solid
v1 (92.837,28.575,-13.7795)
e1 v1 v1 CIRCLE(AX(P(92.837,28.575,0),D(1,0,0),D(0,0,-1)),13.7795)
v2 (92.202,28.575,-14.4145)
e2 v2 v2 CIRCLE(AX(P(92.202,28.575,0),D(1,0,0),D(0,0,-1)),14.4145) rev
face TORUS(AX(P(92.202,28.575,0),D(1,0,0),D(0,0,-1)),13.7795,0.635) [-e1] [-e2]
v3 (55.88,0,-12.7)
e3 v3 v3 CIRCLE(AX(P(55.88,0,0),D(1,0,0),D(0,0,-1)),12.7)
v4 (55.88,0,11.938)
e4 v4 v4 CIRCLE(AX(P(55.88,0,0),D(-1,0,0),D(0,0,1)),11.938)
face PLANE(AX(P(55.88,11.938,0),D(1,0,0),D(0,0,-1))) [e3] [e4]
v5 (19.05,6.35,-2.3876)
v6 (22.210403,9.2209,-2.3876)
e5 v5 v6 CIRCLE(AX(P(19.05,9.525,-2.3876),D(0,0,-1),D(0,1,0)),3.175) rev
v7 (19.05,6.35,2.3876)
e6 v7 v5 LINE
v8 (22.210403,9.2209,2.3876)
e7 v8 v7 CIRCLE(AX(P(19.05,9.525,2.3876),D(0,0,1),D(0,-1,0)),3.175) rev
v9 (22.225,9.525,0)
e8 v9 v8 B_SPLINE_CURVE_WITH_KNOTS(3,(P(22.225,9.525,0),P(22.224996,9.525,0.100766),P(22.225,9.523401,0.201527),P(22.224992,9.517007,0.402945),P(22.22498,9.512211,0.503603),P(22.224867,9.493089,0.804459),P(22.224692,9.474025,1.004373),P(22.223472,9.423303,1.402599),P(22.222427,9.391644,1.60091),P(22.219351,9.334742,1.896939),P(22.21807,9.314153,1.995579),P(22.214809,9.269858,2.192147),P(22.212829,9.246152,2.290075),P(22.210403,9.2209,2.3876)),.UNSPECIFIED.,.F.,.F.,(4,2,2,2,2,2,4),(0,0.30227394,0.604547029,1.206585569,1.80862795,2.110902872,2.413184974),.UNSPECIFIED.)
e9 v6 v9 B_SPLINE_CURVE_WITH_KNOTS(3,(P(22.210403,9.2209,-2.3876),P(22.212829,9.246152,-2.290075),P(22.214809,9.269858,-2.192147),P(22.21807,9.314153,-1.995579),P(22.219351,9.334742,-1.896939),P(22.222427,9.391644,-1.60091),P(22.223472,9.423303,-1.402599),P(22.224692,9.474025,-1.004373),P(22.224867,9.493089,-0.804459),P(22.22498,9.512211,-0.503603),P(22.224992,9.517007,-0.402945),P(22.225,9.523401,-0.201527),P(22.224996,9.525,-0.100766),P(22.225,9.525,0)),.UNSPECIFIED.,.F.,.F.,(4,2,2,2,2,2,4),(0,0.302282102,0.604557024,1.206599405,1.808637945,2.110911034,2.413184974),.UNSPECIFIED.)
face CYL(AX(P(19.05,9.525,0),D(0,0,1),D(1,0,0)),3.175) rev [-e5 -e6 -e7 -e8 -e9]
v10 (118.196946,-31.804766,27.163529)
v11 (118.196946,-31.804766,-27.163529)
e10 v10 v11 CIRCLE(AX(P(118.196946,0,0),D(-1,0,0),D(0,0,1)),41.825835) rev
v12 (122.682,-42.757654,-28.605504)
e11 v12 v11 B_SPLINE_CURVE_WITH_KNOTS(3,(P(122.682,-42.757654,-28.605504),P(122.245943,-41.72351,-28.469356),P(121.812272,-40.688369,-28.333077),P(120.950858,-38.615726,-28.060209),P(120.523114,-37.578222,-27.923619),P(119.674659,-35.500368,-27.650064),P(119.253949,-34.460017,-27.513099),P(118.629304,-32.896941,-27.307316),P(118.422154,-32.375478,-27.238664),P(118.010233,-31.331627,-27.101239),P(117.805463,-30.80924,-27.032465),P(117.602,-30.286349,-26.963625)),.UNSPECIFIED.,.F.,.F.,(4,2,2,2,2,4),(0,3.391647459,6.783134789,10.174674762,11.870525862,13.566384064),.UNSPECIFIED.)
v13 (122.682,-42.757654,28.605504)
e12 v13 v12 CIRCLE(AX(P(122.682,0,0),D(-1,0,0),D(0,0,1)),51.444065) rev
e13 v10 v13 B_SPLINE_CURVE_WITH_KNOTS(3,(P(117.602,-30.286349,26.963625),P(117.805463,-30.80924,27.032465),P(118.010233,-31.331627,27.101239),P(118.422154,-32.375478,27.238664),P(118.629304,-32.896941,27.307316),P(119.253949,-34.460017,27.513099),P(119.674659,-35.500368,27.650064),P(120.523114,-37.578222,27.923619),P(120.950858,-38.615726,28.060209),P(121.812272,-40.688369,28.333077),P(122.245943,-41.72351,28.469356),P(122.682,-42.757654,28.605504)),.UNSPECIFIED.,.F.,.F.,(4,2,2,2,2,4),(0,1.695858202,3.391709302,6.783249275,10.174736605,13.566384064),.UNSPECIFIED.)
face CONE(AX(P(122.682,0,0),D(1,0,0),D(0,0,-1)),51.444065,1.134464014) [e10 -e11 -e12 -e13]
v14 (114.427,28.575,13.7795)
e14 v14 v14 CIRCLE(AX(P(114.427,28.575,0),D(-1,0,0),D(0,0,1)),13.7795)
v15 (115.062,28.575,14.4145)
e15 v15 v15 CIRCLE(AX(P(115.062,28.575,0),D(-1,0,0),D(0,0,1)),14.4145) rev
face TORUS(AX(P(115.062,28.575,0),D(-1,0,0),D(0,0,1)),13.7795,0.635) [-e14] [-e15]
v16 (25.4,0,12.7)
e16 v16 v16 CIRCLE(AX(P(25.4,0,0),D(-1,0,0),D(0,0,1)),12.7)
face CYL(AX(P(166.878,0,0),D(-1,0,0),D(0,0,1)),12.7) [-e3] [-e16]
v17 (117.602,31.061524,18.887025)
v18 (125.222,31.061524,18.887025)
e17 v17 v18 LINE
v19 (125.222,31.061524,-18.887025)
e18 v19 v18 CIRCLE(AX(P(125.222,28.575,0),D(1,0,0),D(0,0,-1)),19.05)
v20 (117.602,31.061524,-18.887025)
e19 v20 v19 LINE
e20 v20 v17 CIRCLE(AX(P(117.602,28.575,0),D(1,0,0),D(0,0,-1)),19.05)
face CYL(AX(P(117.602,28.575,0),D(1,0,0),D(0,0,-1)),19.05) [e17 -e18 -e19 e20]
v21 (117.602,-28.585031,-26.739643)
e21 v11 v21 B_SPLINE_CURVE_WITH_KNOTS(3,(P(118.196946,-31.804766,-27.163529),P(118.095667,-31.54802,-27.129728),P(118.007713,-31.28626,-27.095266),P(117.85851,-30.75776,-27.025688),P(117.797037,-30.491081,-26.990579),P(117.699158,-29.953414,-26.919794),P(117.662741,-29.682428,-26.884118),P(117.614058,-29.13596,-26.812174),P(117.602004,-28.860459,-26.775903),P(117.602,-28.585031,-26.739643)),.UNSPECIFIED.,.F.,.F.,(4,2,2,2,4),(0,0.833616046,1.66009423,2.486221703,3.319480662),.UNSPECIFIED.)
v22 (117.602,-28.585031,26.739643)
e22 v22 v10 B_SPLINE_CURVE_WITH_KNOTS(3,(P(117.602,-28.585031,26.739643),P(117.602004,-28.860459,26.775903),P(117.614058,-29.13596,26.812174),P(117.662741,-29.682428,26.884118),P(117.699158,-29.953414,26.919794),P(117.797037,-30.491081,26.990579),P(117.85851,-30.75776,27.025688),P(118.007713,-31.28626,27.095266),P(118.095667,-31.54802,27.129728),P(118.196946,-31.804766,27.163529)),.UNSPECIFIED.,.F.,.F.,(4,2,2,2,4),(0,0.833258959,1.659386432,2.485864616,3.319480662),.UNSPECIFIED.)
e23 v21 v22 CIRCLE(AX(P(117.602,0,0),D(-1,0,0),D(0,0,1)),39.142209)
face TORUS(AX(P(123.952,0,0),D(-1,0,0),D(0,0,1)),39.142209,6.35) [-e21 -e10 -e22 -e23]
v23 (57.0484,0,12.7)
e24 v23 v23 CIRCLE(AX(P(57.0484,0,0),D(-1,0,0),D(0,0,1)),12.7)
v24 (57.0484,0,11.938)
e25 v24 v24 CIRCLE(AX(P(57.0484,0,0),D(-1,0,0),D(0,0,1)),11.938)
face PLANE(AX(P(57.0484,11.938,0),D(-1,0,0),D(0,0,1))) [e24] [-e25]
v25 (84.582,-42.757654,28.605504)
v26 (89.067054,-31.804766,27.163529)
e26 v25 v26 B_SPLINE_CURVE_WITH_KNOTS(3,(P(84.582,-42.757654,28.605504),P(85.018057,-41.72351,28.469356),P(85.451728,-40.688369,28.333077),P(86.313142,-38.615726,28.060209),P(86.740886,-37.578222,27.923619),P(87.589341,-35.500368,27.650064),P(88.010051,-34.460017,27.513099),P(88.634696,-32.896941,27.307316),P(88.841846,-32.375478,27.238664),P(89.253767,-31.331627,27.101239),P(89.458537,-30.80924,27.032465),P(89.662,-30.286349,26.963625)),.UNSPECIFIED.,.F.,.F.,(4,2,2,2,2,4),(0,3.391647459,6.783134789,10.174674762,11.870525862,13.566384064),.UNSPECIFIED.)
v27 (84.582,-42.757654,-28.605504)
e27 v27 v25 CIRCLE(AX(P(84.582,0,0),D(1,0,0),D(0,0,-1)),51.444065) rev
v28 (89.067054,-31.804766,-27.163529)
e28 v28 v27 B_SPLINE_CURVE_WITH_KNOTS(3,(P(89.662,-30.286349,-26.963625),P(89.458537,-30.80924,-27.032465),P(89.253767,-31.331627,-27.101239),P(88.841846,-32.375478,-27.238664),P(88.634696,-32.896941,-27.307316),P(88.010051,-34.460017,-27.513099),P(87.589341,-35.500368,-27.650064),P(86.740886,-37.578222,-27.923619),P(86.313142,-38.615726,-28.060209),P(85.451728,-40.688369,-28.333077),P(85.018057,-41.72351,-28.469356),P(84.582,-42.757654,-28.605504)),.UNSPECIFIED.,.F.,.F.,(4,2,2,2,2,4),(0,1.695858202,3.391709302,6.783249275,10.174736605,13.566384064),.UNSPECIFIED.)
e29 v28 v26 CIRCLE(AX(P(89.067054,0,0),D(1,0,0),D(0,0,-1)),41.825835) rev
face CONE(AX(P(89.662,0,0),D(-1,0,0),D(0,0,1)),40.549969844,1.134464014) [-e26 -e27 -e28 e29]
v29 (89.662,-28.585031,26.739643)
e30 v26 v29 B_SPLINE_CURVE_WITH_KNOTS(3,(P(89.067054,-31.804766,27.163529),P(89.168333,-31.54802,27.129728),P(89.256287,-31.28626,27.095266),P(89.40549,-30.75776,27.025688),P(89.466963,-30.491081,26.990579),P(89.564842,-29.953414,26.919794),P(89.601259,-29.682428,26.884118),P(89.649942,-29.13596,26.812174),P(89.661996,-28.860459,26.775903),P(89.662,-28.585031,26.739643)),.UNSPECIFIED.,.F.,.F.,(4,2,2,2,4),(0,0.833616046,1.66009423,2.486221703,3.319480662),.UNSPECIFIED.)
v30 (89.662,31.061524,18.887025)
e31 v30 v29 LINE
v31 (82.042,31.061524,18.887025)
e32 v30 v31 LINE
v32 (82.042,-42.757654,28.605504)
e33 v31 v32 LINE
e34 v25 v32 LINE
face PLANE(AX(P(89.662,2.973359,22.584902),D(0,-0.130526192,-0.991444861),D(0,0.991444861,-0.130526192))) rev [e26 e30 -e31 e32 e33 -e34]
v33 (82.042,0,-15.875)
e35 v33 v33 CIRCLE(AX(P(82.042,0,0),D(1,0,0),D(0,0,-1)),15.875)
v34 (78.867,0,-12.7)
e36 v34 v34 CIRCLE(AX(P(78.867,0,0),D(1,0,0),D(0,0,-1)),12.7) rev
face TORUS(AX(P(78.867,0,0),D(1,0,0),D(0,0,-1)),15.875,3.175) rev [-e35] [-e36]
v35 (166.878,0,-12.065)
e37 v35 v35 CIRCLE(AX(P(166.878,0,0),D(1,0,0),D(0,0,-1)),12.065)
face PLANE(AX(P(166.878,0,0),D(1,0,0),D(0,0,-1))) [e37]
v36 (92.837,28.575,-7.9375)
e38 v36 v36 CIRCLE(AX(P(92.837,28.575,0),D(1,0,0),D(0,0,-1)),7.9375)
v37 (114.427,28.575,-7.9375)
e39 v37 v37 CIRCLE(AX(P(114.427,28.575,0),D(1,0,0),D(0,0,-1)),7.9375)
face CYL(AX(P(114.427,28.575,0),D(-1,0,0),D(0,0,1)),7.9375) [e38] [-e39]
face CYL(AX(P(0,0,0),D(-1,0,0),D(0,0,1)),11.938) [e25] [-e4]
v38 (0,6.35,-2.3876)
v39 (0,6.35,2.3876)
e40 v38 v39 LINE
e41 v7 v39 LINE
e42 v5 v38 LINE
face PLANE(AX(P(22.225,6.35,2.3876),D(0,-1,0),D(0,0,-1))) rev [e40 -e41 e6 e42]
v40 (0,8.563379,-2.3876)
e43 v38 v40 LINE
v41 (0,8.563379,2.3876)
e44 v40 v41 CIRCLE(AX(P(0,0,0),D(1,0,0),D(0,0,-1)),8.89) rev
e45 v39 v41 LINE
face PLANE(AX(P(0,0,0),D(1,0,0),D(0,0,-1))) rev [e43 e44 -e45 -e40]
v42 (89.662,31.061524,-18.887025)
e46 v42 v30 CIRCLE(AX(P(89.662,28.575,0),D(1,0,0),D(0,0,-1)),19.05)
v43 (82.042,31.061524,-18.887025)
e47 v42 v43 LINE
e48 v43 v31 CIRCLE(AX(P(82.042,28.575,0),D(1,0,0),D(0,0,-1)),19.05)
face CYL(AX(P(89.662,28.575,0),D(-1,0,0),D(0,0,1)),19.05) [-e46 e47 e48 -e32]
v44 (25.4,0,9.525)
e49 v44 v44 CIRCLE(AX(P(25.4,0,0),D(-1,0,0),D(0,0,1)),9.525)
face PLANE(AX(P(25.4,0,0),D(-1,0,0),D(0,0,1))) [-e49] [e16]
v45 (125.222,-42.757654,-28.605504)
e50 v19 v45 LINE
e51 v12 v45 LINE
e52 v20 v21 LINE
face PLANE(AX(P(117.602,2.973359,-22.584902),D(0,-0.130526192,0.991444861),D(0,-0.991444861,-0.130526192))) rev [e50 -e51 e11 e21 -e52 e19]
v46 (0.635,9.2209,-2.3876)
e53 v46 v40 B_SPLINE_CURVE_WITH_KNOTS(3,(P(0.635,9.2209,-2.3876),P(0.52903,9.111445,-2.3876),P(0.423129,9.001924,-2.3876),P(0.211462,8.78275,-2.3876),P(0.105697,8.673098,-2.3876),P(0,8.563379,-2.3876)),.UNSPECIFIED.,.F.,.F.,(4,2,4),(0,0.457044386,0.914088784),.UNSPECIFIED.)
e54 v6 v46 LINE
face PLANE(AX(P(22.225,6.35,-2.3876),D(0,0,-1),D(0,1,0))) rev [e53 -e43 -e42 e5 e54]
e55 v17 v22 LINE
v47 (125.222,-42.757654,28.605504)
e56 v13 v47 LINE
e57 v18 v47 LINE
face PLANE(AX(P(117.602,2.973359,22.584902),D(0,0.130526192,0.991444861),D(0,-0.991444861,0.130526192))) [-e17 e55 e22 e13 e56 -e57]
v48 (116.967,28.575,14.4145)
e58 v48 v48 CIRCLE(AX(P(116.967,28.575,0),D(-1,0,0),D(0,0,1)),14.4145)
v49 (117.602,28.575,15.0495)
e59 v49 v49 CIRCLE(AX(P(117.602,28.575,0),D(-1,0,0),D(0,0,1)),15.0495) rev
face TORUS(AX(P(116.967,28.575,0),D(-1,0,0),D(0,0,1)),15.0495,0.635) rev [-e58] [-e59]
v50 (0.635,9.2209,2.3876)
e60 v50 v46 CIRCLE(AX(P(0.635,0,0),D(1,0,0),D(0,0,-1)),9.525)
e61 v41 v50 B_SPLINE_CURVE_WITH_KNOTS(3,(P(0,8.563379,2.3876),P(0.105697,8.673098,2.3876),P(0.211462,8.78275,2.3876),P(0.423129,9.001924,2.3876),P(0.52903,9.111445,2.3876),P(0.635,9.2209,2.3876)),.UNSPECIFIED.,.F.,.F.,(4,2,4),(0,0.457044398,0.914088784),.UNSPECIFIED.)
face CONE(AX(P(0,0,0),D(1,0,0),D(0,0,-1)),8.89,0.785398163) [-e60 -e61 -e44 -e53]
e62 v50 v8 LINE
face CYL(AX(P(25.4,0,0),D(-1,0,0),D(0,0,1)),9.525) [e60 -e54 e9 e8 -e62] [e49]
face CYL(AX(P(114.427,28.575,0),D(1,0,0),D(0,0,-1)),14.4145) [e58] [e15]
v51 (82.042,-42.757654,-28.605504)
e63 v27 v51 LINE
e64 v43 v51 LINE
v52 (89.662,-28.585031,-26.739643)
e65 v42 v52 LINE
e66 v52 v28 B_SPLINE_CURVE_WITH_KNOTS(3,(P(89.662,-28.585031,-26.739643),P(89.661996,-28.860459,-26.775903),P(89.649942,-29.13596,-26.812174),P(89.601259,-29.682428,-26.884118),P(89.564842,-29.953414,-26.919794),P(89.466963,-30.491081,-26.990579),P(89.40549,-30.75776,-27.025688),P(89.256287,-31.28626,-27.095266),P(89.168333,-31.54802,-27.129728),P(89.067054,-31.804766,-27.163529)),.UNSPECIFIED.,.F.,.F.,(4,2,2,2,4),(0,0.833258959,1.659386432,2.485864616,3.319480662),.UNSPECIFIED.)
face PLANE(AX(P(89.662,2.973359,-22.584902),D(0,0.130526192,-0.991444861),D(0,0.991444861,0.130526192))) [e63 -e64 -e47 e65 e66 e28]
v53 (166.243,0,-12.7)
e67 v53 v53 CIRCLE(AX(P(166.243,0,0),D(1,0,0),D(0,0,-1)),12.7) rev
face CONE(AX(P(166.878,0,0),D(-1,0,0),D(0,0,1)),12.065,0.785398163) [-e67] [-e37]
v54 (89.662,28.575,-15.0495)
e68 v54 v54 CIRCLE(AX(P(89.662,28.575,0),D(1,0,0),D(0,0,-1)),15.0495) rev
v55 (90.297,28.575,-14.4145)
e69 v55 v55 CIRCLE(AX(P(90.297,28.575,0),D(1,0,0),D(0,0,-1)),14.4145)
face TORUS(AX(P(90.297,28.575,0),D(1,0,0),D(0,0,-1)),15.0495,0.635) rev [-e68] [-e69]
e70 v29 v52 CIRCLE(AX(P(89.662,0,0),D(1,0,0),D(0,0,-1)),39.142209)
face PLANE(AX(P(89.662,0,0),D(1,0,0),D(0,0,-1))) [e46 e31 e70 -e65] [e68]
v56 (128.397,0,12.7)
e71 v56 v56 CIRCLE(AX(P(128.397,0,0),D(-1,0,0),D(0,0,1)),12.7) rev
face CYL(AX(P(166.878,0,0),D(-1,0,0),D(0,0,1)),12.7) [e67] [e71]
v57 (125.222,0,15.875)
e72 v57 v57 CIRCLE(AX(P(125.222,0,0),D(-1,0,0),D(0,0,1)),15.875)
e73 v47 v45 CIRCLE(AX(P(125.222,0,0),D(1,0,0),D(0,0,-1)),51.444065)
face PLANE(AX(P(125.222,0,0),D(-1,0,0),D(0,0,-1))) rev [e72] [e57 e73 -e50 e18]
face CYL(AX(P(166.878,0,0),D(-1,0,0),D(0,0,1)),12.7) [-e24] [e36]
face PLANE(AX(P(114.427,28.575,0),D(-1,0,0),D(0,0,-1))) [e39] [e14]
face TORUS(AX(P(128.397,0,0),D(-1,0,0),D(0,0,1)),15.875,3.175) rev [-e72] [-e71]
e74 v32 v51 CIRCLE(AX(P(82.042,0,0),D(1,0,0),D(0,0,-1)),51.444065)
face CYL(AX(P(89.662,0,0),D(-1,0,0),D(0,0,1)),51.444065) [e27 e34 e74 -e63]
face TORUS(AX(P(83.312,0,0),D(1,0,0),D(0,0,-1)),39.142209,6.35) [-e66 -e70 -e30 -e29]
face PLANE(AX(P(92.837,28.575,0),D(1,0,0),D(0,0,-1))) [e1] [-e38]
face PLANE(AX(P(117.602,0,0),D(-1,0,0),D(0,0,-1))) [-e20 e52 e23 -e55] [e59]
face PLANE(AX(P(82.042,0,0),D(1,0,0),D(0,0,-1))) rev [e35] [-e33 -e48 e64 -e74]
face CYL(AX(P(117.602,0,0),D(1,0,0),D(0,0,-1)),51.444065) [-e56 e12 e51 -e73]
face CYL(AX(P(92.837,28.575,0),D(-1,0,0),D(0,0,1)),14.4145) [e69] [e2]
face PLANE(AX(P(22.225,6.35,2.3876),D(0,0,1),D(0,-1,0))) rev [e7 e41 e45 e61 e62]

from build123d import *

# Parameters (mm, degrees)
BASE_SKETCH_R          = 12.7
BASE_DEPTH             = 166.878
FRONT_SKETCH_OUTSIDE_W = 61.54
FRONT_SKETCH_OUTSIDE_H = 61.54
FRONT_SKETCH_OUTSIDE_R = 9.525
FRONT_CUT_DEPTH        = 25.4
KEYHOLE_SKETCH_W       = 4.7752
KEYHOLE_SKETCH_H       = 6.35
KEYHOLE_DEPTH          = 22.225
KEYHOLE_FILLET_R       = 3.175
GROOVE_SKETCH_W        = 1.1684
GROOVE_SKETCH_H        = 1.524
EXTERIOR_START         = -82.042
EXTERIOR_SKETCH_R      = 12.7
EXTERIOR_CUT_DEPTH     = 43.18
SHAFT_SKETCH_R         = 19.05
SHAFT_SKETCH_R_2       = 14.4145
SHAFT_DEPTH            = 7.62
LARGE_CIRCLE_SKETCH_R  = 14.4145
LARGE_CIRCLE_DEPTH     = 3.175
BRIDGE_SKETCH_R        = 7.9375
BRIDGE_DEPTH           = 21.59
SHAFT_CHAMFER_SIZE     = 5.08
SHAFT_CHAMFER_SIZE2    = 10.894095156
REAR_CHAMFER_SIZE      = 5.08
REAR_CHAMFER_SIZE2     = 10.894095156
BACK_BASE_SKETCH_R     = 12.7
BACK_BASE_DEPTH        = 41.656
CIRCLE_FILLET_R        = 0.635
BASE_FILLET_R          = 3.175
SHAFT_FILLET_R         = 6.35
BASE_CHAMFER_SIZE      = 0.635


with BuildPart() as part:
    # Base Sketch → Base (new body)
    with BuildSketch(Plane(origin=(0, 0, 0), x_dir=(0, 0, -1), z_dir=(1, 0, 0))):
        Circle(BASE_SKETCH_R)
    extrude(amount=BASE_DEPTH)

    # Front Sketch outside → Front Cut (cut)
    with BuildSketch(Plane.ZY):
        Rectangle(FRONT_SKETCH_OUTSIDE_W, FRONT_SKETCH_OUTSIDE_H)
        Circle(FRONT_SKETCH_OUTSIDE_R, mode=Mode.SUBTRACT)
    extrude(amount=-FRONT_CUT_DEPTH, mode=Mode.SUBTRACT)

    # Keyhole Sketch → Keyhole (cut)
    with BuildSketch(Plane.ZY):
        with Locations((0, 9.525)):
            Rectangle(KEYHOLE_SKETCH_W, KEYHOLE_SKETCH_H)
    extrude(amount=-KEYHOLE_DEPTH, mode=Mode.SUBTRACT)

    # Keyhole Fillet
    keyhole_fillet_edges = [part.edges().sort_by_distance(p)[0] for p in [
        (22.225, 6.35, 0),
    ]]
    fillet(keyhole_fillet_edges, radius=KEYHOLE_FILLET_R - 0.0001)  # a hair under: the kernel refuses the full size

    # Groove Sketch → Front Groove (revolve, cut)
    with BuildSketch(Plane.XY, mode=Mode.PRIVATE) as front_groove_sk:
        with Locations((56.4642, 12.7)):
            Rectangle(GROOVE_SKETCH_W, GROOVE_SKETCH_H)
    revolve(front_groove_sk.sketch.rotate(Axis((0, 0, 0), (1, 0, 0)), 90), axis=Axis((0, 0, 0), (1, 0, 0)), mode=Mode.SUBTRACT)

    # Exterior Sketch → Exterior Cut (cut)
    with BuildSketch(Plane.ZY.offset(EXTERIOR_START)):
        Circle(EXTERIOR_SKETCH_R)
    extrude(amount=-EXTERIOR_CUT_DEPTH, mode=Mode.SUBTRACT)


with BuildPart() as body_2:
    # of the pieces the cut leaves, the one that is kept (exterior_cut_keep)
    add(part.part.solids().sort_by_distance((22.210412317, 9.220899696, 2.3876))[0])

    # Shaft Sketch → Shaft (add)
    # profile 1 of 3: a face of its own
    with BuildSketch(Plane(origin=(82.042, 0, 0), x_dir=(0, 0, -1), z_dir=(1, 0, 0))):
        with BuildLine():
            ThreePointArc((19.05, 28.575), (-1.245929612, 9.565787512), (-18.887024609, 31.061523962))
            Line((-18.887024609, 31.061523962), (-28.605503762, -42.757654032))
            ThreePointArc((-28.605503762, -42.757654032), (0, -51.444065), (28.605503762, -42.757654032))
            Line((28.605503762, -42.757654032), (18.887024609, 31.061523962))
            ThreePointArc((18.887024609, 31.061523962), (19.009212488, 29.820929612), (19.05, 28.575))
        make_face()
    # profile 2 of 3: a face of its own
    with BuildSketch(Plane(origin=(82.042, 0, 0), x_dir=(0, 0, -1), z_dir=(1, 0, 0))):
        with Locations((0, 28.575)):
            Circle(SHAFT_SKETCH_R)
        with Locations((0, 28.575)):
            Circle(SHAFT_SKETCH_R_2, mode=Mode.SUBTRACT)
    # profile 3 of 3: a face of its own
    with BuildSketch(Plane(origin=(82.042, 0, 0), x_dir=(0, 0, -1), z_dir=(1, 0, 0))):
        with Locations((0, 28.575)):
            Circle(SHAFT_SKETCH_R_2)
    shaft = extrude(amount=SHAFT_DEPTH)

    # Large Circle Sketch → Large Circle (add)
    with BuildSketch(Plane(origin=(89.662, 0, 0), x_dir=(0, 0, -1), z_dir=(1, 0, 0))):
        with Locations((0, 28.575)):
            Circle(LARGE_CIRCLE_SKETCH_R)
    large_circle = extrude(amount=LARGE_CIRCLE_DEPTH)

    # Bridge Sketch → Bridge (add)
    with BuildSketch(Plane(origin=(92.837, 0, 0), x_dir=(0, 0, -1), z_dir=(1, 0, 0))):
        with Locations((0, 28.575)):
            Circle(BRIDGE_SKETCH_R)
    extrude(amount=BRIDGE_DEPTH)

    # Shaft Chamfer
    shaft_chamfer_edges = [body_2.edges().sort_by_distance(p)[0] for p in [
        (89.662, -51.444065, 0),
    ]]
    shaft_chamfer_side = [body_2.faces().sort_by_distance(p)[0] for p in [
        (85.852, -51.444065, 0),
    ]]
    chamfer(shaft_chamfer_edges, length=SHAFT_CHAMFER_SIZE, length2=SHAFT_CHAMFER_SIZE2, reference=shaft_chamfer_side[0])

    # Large Circle Mirror: Large Circle across plane
    add(large_circle.mirror(Plane(origin=(103.632, 0, 0), x_dir=(0, 0, 1), z_dir=(1, 0, 0))))

    # Shaft Mirror: Shaft across plane
    add(shaft.mirror(Plane(origin=(103.632, 0, 0), x_dir=(0, 0, 1), z_dir=(1, 0, 0))))

    # Rear Chamfer
    rear_chamfer_edges = [body_2.edges().sort_by_distance(p)[0] for p in [
        (117.602, -51.444065, 0),
    ]]
    rear_chamfer_side = [body_2.faces().sort_by_distance(p)[0] for p in [
        (121.412, -51.444065, 0),
    ]]
    chamfer(rear_chamfer_edges, length=REAR_CHAMFER_SIZE, length2=REAR_CHAMFER_SIZE2, reference=rear_chamfer_side[0])

    # Back Base Sketch → Back Base (add)
    with BuildSketch(Plane(origin=(125.222, 0, 0), x_dir=(0, 0, -1), z_dir=(1, 0, 0))):
        with Locations(Location((0, 0, 0), (0, 0, 180))):
            Circle(BACK_BASE_SKETCH_R)
    extrude(amount=BACK_BASE_DEPTH)

    # Circle Fillet
    circle_fillet_edges = [body_2.edges().sort_by_distance(p)[0] for p in [
        (89.662, 28.575, 14.4145),
        (92.837, 28.575, 14.4145),
        (114.427, 28.575, 14.4145),
        (117.602, 28.575, 14.4145),
    ]]
    fillet(circle_fillet_edges, radius=CIRCLE_FILLET_R)

    # Base Fillet
    base_fillet_edges = [body_2.edges().sort_by_distance(p)[0] for p in [
        (125.222, 0, -12.7),
        (82.042, 0, 12.7),
    ]]
    fillet(base_fillet_edges, radius=BASE_FILLET_R)

    # Shaft Fillet
    shaft_fillet_edges = [body_2.edges().sort_by_distance(p)[0] for p in [
        (117.602, -40.549969844, 0),
        (89.662, -40.549969844, 0),
    ]]
    fillet(shaft_fillet_edges, radius=SHAFT_FILLET_R)

    # Base Chamfer
    base_chamfer_edges = [body_2.edges().sort_by_distance(p)[0] for p in [
        (166.878, 0, -12.7),
        (0, -7.532181457, -5.830254497),
    ]]
    chamfer(base_chamfer_edges, length=BASE_CHAMFER_SIZE)


solid = body_2.part
